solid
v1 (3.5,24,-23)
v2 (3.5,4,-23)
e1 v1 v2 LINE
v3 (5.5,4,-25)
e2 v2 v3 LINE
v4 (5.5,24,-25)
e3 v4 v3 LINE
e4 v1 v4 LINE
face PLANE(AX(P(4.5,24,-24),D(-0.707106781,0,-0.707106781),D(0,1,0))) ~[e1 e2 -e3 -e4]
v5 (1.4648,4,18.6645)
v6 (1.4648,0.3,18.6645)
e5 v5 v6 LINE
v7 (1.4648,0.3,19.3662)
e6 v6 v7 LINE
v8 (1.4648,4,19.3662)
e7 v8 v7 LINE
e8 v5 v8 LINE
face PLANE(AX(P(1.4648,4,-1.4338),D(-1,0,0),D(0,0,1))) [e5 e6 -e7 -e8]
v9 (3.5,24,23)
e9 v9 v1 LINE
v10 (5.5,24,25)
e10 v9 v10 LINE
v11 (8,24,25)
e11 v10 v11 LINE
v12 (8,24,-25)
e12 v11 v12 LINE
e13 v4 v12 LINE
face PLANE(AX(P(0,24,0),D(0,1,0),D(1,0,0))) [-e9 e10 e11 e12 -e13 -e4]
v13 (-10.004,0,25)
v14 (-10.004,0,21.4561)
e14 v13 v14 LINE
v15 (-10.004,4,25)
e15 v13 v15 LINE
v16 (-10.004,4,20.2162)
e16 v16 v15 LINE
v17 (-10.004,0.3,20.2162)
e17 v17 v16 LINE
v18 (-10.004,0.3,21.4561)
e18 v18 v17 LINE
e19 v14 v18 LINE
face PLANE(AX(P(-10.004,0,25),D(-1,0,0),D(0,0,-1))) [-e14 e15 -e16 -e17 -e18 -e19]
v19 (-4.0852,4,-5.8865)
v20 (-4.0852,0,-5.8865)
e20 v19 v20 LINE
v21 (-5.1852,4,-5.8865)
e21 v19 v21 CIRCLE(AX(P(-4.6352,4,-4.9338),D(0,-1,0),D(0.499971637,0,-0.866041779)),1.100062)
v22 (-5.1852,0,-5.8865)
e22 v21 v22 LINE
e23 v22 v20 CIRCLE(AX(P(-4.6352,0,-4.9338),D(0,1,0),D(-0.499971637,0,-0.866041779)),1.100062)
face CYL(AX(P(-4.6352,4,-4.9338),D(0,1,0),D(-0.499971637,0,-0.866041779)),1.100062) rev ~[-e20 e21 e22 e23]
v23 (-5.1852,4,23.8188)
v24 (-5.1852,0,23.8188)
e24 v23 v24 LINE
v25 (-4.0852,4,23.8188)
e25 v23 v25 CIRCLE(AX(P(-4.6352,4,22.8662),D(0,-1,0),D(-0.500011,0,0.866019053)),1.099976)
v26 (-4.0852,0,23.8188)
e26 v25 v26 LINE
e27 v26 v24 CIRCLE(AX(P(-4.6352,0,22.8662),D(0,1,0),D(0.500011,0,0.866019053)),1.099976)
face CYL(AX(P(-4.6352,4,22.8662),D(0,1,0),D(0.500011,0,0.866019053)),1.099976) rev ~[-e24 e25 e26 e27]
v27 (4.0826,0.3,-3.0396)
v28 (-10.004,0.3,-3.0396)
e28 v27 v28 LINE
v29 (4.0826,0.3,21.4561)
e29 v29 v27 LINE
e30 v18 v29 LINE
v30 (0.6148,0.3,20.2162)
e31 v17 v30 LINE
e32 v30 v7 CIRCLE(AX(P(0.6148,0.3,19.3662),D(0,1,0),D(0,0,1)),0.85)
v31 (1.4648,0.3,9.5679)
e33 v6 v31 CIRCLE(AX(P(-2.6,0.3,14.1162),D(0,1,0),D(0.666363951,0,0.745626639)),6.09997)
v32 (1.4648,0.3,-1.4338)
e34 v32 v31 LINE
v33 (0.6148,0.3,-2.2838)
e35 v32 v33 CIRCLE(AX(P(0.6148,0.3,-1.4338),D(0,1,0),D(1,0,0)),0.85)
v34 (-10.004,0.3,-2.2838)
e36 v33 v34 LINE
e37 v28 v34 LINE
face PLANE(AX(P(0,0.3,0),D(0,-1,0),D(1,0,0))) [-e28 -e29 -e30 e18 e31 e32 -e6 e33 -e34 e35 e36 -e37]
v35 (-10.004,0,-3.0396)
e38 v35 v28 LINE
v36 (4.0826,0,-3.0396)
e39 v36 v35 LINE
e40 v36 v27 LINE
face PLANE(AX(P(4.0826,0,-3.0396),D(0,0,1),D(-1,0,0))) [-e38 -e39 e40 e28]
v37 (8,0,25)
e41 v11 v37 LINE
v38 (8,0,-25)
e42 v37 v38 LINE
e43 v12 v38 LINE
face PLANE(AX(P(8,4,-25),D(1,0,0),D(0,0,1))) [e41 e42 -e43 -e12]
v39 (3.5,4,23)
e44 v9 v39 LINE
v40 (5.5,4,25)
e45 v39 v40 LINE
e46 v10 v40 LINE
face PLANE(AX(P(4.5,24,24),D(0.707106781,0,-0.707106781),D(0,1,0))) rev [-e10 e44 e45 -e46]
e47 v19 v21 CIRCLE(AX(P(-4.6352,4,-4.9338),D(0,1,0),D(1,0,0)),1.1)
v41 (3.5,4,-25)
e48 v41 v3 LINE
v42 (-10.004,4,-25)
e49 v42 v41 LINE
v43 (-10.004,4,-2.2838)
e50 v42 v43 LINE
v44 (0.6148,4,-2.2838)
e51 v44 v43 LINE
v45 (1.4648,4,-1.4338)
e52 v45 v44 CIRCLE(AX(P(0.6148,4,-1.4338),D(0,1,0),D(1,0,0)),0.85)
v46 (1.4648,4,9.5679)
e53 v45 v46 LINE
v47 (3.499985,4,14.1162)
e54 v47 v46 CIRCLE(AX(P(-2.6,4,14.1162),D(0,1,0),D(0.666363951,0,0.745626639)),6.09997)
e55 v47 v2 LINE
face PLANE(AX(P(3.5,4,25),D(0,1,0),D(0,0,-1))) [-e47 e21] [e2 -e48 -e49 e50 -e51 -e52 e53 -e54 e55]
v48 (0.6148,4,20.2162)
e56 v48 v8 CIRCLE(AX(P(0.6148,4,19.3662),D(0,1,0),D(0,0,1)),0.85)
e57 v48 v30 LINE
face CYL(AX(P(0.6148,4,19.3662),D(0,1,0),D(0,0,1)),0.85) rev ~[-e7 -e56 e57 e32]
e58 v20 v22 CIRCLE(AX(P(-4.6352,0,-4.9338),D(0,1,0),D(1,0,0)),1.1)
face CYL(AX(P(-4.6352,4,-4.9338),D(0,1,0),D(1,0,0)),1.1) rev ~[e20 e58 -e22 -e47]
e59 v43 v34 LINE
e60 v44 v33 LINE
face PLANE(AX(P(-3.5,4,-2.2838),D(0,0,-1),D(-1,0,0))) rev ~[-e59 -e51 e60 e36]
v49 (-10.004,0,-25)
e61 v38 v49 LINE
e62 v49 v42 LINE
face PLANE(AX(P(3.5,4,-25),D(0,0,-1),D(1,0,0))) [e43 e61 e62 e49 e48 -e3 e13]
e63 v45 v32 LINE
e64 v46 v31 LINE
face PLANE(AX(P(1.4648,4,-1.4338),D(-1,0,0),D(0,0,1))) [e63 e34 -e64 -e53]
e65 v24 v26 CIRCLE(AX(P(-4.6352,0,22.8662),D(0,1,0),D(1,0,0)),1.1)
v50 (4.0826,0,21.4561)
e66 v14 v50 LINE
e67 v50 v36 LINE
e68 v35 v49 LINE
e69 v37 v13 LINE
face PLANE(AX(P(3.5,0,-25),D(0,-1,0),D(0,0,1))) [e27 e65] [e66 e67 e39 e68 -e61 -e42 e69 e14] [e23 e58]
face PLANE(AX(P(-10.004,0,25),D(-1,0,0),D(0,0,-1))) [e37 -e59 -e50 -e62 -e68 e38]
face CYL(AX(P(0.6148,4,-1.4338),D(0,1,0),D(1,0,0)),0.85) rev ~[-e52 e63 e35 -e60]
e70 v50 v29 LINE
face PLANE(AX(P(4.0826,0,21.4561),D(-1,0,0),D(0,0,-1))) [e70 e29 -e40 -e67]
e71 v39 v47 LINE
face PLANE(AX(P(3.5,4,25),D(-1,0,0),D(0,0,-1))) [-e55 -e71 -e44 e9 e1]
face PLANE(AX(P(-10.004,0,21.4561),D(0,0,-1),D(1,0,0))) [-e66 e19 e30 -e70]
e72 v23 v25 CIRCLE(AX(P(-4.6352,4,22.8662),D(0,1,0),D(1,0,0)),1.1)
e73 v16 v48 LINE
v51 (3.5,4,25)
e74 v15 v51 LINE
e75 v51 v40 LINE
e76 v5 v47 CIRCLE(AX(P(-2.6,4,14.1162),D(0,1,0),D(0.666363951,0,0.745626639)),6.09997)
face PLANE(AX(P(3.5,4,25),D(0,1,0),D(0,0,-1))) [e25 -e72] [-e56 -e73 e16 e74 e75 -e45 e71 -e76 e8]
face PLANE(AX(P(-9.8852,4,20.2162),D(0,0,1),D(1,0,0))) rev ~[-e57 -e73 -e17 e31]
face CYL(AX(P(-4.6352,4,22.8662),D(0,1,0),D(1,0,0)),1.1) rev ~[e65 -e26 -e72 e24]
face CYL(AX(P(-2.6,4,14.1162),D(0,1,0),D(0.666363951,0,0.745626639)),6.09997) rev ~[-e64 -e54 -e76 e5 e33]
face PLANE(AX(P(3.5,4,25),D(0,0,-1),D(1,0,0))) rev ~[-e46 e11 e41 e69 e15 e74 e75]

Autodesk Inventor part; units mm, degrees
ref_plane "YZ Plane" through (0, 0, 0) normal (1, 0, 0) x (0, 1, 0)
ref_plane "XZ Plane" through (0, 0, 0) normal (0, 1, 0) x (-1, 0, 0)
ref_plane "XY Plane" through (0, 0, 0) normal (0, 0, 1) x (1, 0, 0)
sketch "Эскиз1" plane through (0, 0, 0) normal (0, 1, 0) x (-1, 0, 0)
  line L0 (0, 0) -> (0, -20)
  circle A0 centre (0, -20) radius 2
  line L1 (-3.5, 25) -> (3.5, 25)
  line L2 (3.5, 25) -> (3.5, -25)
  line L3 (3.5, -25) -> (-3.5, -25)
  line L4 (-3.5, -25) -> (-3.5, 25)
  line L5 (-3.5, 25) -> (3.5, -25) construction
  line L6 (3.5, 25) -> (-3.5, -25) construction
  line L7 (0, 0) -> (0, 20)
  circle A1 centre (0, 20) radius 2
  dimension "d0" = 20
  dimension "d1" = 4
  dimension "d2" = 7
  dimension "d3" = 50
  dimension "d4" = 20
  dimension "d5" = 4
extrude "Выдавливание1" add sketch "Эскиз1" along normal blind 4 contours A0 | L1 L2 L3 L4 | A1
sketch "Эскиз2" plane through (3.5, 0, 25) normal (1, 0, 0) x (0, 0, -1)
  line L0 (50, 0) -> (0, 0) projected
  line L1 (0, 4) -> (50, 4)
  line L2 (50, 4) -> (50, 0)
  line L3 (50, 0) -> (0, 0)
  line L4 (0, 0) -> (0, 4)
  point P0 (25, 0)
extrude "Выдавливание2" add sketch "Эскиз2" along normal blind 7
sketch "Эскиз3" plane through (0, 4, 0) normal (0, 1, 0) x (1, 0, 0)
  line L0 (-3.5, -25) -> (10.5, -25) projected
  line L1 (-3.5, 25) -> (10.5, 25) projected
  line L2 (10.5, -25) -> (3.5, -25)
  line L3 (3.5, -25) -> (3.5, 25)
  line L4 (3.5, 25) -> (10.5, 25)
  line L5 (10.5, 25) -> (10.5, -25)
  point P0 (0, 0)
  dimension "d10" = 7
extrude "Выдавливание3" add sketch "Эскиз3" along normal blind 20
sketch "Эскиз5" plane through (0, 4, 0) normal (0, 1, 0) x (1, 0, 0)
  line L0 (-7.5352, -8.6362) -> (-7.5352, -8.5162)
  arc A0 (-1.7352, -8.5162) -> (-7.5352, -8.5162) centre (-4.6352, -8.5162) ccw
  line L1 (-1.7352, -8.5162) -> (-1.7352, -8.6362)
  arc A1 (1.3648, -12.5541) -> (-1.7352, -8.6362) centre (-4.6352, -14.1162) ccw
  line L2 (1.3648, -12.5541) -> (1.3648, 1.4338)
  arc A2 (1.3648, 1.4338) -> (0.6148, 2.1838) centre (0.6148, 1.4338) ccw
  line L3 (0.6148, 2.1838) -> (-9.8852, 2.1838)
  arc A3 (-9.8852, 2.1838) -> (-10.6352, 1.4338) centre (-9.8852, 1.4338) ccw
  line L4 (-10.6352, 1.4338) -> (-10.6352, -12.5541)
  arc A4 (-7.5352, -8.6362) -> (-10.6352, -12.5541) centre (-4.6352, -14.1162) ccw
  line L5 (0.4648, -4.2162) -> (0.4648, 0.7838)
  arc A5 (-0.0352, -4.7162) -> (0.4648, -4.2162) centre (-0.0352, -4.2162) ccw
  line L6 (-9.2352, -4.7162) -> (-0.0352, -4.7162)
  arc A6 (-9.7352, -4.2162) -> (-9.2352, -4.7162) centre (-9.2352, -4.2162) ccw
  line L7 (-9.7352, 0.7838) -> (-9.7352, -4.2162)
  arc A7 (-9.2352, 1.2838) -> (-9.7352, 0.7838) centre (-9.2352, 0.7838) ccw
  line L8 (-0.0352, 1.2838) -> (-9.2352, 1.2838)
  arc A8 (0.4648, 0.7838) -> (-0.0352, 1.2838) centre (-0.0352, 0.7838) ccw
  arc A9 (-5.1852, 5.8865) -> (-4.0852, 5.8865) centre (-4.6352, 4.9338) ccw
  line L9 (-5.1852, 7.0838) -> (-5.1852, 5.8865)
  line L10 (-5.1852, 7.0838) -> (-9.8852, 7.0838)
  arc A10 (-9.8852, 7.0838) -> (-10.7352, 6.2338) centre (-9.8852, 6.2338) ccw
  line L11 (-10.7352, 6.2338) -> (-10.7352, 1.4338)
  arc A11 (-9.8852, 2.2838) -> (-10.7352, 1.4338) centre (-9.8852, 1.4338) ccw
  line L12 (0.6148, 2.2838) -> (-9.8852, 2.2838)
  arc A12 (1.4648, 1.4338) -> (0.6148, 2.2838) centre (0.6148, 1.4338) ccw
  line L13 (1.4648, 1.4338) -> (1.4648, 6.2338)
  arc A13 (1.4648, 6.2338) -> (0.6148, 7.0838) centre (0.6148, 6.2338) ccw
  line L14 (0.6148, 7.0838) -> (-4.0852, 7.0838)
  line L15 (-4.0852, 5.8865) -> (-4.0852, 7.0838)
  line L16 (-9.8852, -25.0162) -> (-5.1852, -25.0162)
  line L17 (-5.1852, -23.8188) -> (-5.1852, -25.0162)
  arc A14 (-4.0852, -23.8188) -> (-5.1852, -23.8188) centre (-4.6352, -22.8662) ccw
  line L18 (-4.0852, -25.0162) -> (-4.0852, -23.8188)
  line L19 (-4.0852, -25.0162) -> (0.6148, -25.0162)
  arc A15 (0.6148, -25.0162) -> (1.4648, -24.1662) centre (0.6148, -24.1662) ccw
  line L20 (1.4648, -24.1662) -> (1.4648, -19.3662)
  arc A16 (0.6148, -20.2162) -> (1.4648, -19.3662) centre (0.6148, -19.3662) ccw
  line L21 (-9.8852, -20.2162) -> (0.6148, -20.2162)
  arc A17 (-10.7352, -19.3662) -> (-9.8852, -20.2162) centre (-9.8852, -19.3662) ccw
  line L22 (-10.7352, -19.3662) -> (-10.7352, -24.1662)
  arc A18 (-10.7352, -24.1662) -> (-9.8852, -25.0162) centre (-9.8852, -24.1662) ccw
  line L23 (-10.7352, -19.3662) -> (-10.7352, -15.6782)
  line L24 (-10.7352, -12.5541) -> (-10.7352, -14.1162)
  line L25 (-10.7352, -14.1162) -> (-10.7352, -15.6782)
  line L26 (-10.7352, -12.5541) -> (-10.7352, 1.4338)
  line L27 (1.4648, 1.4338) -> (1.4648, -12.5541)
  line L28 (1.4648, -15.6782) -> (1.4648, -19.3662)
  line L29 (1.4648, -15.6782) -> (1.4648, -14.1162)
  line L30 (1.4648, -14.1162) -> (1.4648, -12.5541)
  arc A19 (-10.6352, -15.6782) -> (-6.1972, -20.1162) centre (-4.6352, -14.1162) ccw
  line L31 (-10.6352, -15.6782) -> (-10.6352, -19.3662)
  arc A20 (-10.6352, -19.3662) -> (-9.8852, -20.1162) centre (-9.8852, -19.3662) ccw
  line L32 (-9.8852, -20.1162) -> (-6.1972, -20.1162)
  line L33 (1.3648, -19.3662) -> (1.3648, -15.6782)
  arc A21 (-3.0731, -20.1162) -> (1.3648, -15.6782) centre (-4.6352, -14.1162) ccw
  line L34 (-3.0731, -20.1162) -> (0.6148, -20.1162)
  arc A22 (0.6148, -20.1162) -> (1.3648, -19.3662) centre (0.6148, -19.3662) ccw
  circle A23 centre (-4.6352, 4.9338) radius 1.1
  line L35 (-5.1852, 5.8865) -> (-5.1852, 7.0838)
  line L36 (-4.0852, 7.0838) -> (-5.1852, 7.0838)
  circle A24 centre (-4.6352, -22.8662) radius 1.1
  line L37 (-5.1852, -25.0162) -> (-5.1852, -23.8188)
  line L38 (-4.0852, -25.0162) -> (-5.1852, -25.0162)
  circle A25 centre (-4.6352, -14.1162) radius 0.8
  line L39 (-3.5, 25) -> (3.5, 25) projected
  line L40 (-13.5, 25) -> (-13.5, -25)
  line L41 (-13.5, -25) -> (-3.5, -25)
  line L42 (-3.5, -25) -> (-3.5, 25)
  point P0 (0, 0)
  point P1 (-4.6352, -8.9662)
  dimension "d16" = 10
extrude "Выдавливание5" cut sketch "Эскиз5" against normal blind 10 contours A4 L4 A3 L3 L42 L8 A7 L7 A6 L6 A0 L0 | L0 A0 L42 L21 A17 L23 L25 L24 L26 A11 L12 L3 A3 L4 A4 | L42 L6 A5 L5 A8 L8 L3 A2 L2 A1 L1 A0 | A0 L1 A1 L2 A2 L3 L42 L12 A12 L27 L30 L29 L28 A16 L21 | L42 L8 A8 L5 A5 L6 | L6 A6 L7 A7 L8 L42 | A19 L32 A20 L31 | A22 L34 A21 L33 | A25
move faces "Перенос1" translate (-6.504, 0, 0) faces at (-3.5, 2.6667, -9.8559) (-3.5, 1.3333, 23.4054)
sketch "Эскиз6" plane through (0, 4, 0) normal (0, 1, 0) x (1, 0, 0)
  arc A0 (1.4648, -18.6645) -> (1.4648, -9.5679) centre (-2.6, -14.1162) ccw
  line L0 (1.4648, -9.5679) -> (1.4648, -19.3662)
  point P0 (0, 0)
  point P1 (0.2532, -8.7246)
  point P2 (-5.4532, -8.7246)
extrude "Выдавливание6" cut sketch "Эскиз6" against normal blind 7
sketch "Эскиз7" plane through (0, 0, 0) normal (0, -1, 0) x (1, 0, 0)
  line L0 (-10.004, 25) -> (-10.004, 20.2162) projected
  line L1 (-10.004, 21.4561) -> (4.0826, 21.4561)
  line L2 (4.0826, 21.4561) -> (4.0826, -3.0396)
  line L3 (4.0826, -3.0396) -> (-10.004, -3.0396)
  line L4 (-10.004, -3.0396) -> (-10.004, 21.4561)
  point P0 (0, 0)
extrude "Выдавливание7" cut sketch "Эскиз7" against normal blind 0.3
sketch "Эскиз8" plane through (0, 4, 0) normal (0, 1, 0) x (1, 0, 0)
  line L0 (-7.5352, -8.6362) -> (-7.5352, -8.5162)
  arc A0 (-1.7352, -8.5162) -> (-7.5352, -8.5162) centre (-4.6352, -8.5162) ccw
  line L1 (-1.7352, -8.5162) -> (-1.7352, -8.6362)
  arc A1 (1.3648, -12.5541) -> (-1.7352, -8.6362) centre (-4.6352, -14.1162) ccw
  line L2 (1.3648, -12.5541) -> (1.3648, 1.4338)
  arc A2 (1.3648, 1.4338) -> (0.6148, 2.1838) centre (0.6148, 1.4338) ccw
  line L3 (0.6148, 2.1838) -> (-9.8852, 2.1838)
  arc A3 (-9.8852, 2.1838) -> (-10.6352, 1.4338) centre (-9.8852, 1.4338) ccw
  line L4 (-10.6352, 1.4338) -> (-10.6352, -12.5541)
  arc A4 (-7.5352, -8.6362) -> (-10.6352, -12.5541) centre (-4.6352, -14.1162) ccw
  line L5 (0.4648, -4.2162) -> (0.4648, 0.7838)
  arc A5 (-0.0352, -4.7162) -> (0.4648, -4.2162) centre (-0.0352, -4.2162) ccw
  line L6 (-9.2352, -4.7162) -> (-0.0352, -4.7162)
  arc A6 (-9.7352, -4.2162) -> (-9.2352, -4.7162) centre (-9.2352, -4.2162) ccw
  line L7 (-9.7352, 0.7838) -> (-9.7352, -4.2162)
  arc A7 (-9.2352, 1.2838) -> (-9.7352, 0.7838) centre (-9.2352, 0.7838) ccw
  line L8 (-0.0352, 1.2838) -> (-9.2352, 1.2838)
  arc A8 (0.4648, 0.7838) -> (-0.0352, 1.2838) centre (-0.0352, 0.7838) ccw
  arc A9 (-5.1852, 5.8865) -> (-4.0852, 5.8865) centre (-4.6352, 4.9338) ccw
  line L9 (-5.1852, 7.0838) -> (-5.1852, 5.8865)
  line L10 (-5.1852, 7.0838) -> (-9.8852, 7.0838)
  arc A10 (-9.8852, 7.0838) -> (-10.7352, 6.2338) centre (-9.8852, 6.2338) ccw
  line L11 (-10.7352, 6.2338) -> (-10.7352, 1.4338)
  arc A11 (-9.8852, 2.2838) -> (-10.7352, 1.4338) centre (-9.8852, 1.4338) ccw
  line L12 (0.6148, 2.2838) -> (-9.8852, 2.2838)
  arc A12 (1.4648, 1.4338) -> (0.6148, 2.2838) centre (0.6148, 1.4338) ccw
  line L13 (1.4648, 1.4338) -> (1.4648, 6.2338)
  arc A13 (1.4648, 6.2338) -> (0.6148, 7.0838) centre (0.6148, 6.2338) ccw
  line L14 (0.6148, 7.0838) -> (-4.0852, 7.0838)
  line L15 (-4.0852, 5.8865) -> (-4.0852, 7.0838)
  line L16 (-9.8852, -25.0162) -> (-5.1852, -25.0162)
  line L17 (-5.1852, -23.8188) -> (-5.1852, -25.0162)
  arc A14 (-4.0852, -23.8188) -> (-5.1852, -23.8188) centre (-4.6352, -22.8662) ccw
  line L18 (-4.0852, -25.0162) -> (-4.0852, -23.8188)
  line L19 (-4.0852, -25.0162) -> (0.6148, -25.0162)
  arc A15 (0.6148, -25.0162) -> (1.4648, -24.1662) centre (0.6148, -24.1662) ccw
  line L20 (1.4648, -24.1662) -> (1.4648, -19.3662)
  arc A16 (0.6148, -20.2162) -> (1.4648, -19.3662) centre (0.6148, -19.3662) ccw
  line L21 (-9.8852, -20.2162) -> (0.6148, -20.2162)
  arc A17 (-10.7352, -19.3662) -> (-9.8852, -20.2162) centre (-9.8852, -19.3662) ccw
  line L22 (-10.7352, -19.3662) -> (-10.7352, -24.1662)
  arc A18 (-10.7352, -24.1662) -> (-9.8852, -25.0162) centre (-9.8852, -24.1662) ccw
  line L23 (-10.7352, -19.3662) -> (-10.7352, -15.6782)
  line L24 (-10.7352, -12.5541) -> (-10.7352, -14.1162)
  line L25 (-10.7352, -14.1162) -> (-10.7352, -15.6782)
  line L26 (-10.7352, -12.5541) -> (-10.7352, 1.4338)
  line L27 (1.4648, 1.4338) -> (1.4648, -12.5541)
  line L28 (1.4648, -15.6782) -> (1.4648, -19.3662)
  line L29 (1.4648, -15.6782) -> (1.4648, -14.1162)
  line L30 (1.4648, -14.1162) -> (1.4648, -12.5541)
  arc A19 (-10.6352, -15.6782) -> (-6.1972, -20.1162) centre (-4.6352, -14.1162) ccw
  line L31 (-10.6352, -15.6782) -> (-10.6352, -19.3662)
  arc A20 (-10.6352, -19.3662) -> (-9.8852, -20.1162) centre (-9.8852, -19.3662) ccw
  line L32 (-9.8852, -20.1162) -> (-6.1972, -20.1162)
  line L33 (1.3648, -19.3662) -> (1.3648, -15.6782)
  arc A21 (-3.0731, -20.1162) -> (1.3648, -15.6782) centre (-4.6352, -14.1162) ccw
  line L34 (-3.0731, -20.1162) -> (0.6148, -20.1162)
  arc A22 (0.6148, -20.1162) -> (1.3648, -19.3662) centre (0.6148, -19.3662) ccw
  circle A23 centre (-4.6352, 4.9338) radius 1.1
  line L35 (-5.1852, 5.8865) -> (-5.1852, 7.0838)
  line L36 (-4.0852, 7.0838) -> (-5.1852, 7.0838)
  circle A24 centre (-4.6352, -22.8662) radius 1.1
  line L37 (-5.1852, -25.0162) -> (-5.1852, -23.8188)
  line L38 (-4.0852, -25.0162) -> (-5.1852, -25.0162)
  circle A25 centre (-4.6352, -14.1162) radius 0.8
  line L39 (-3.5, 25) -> (3.5, 25)
  line L40 (-13.5, 25) -> (-13.5, -25)
  line L41 (-13.5, -25) -> (-3.5, -25)
  line L42 (-3.5, -25) -> (-3.5, 25)
  point P0 (0, 0)
  point P1 (0, 0)
  point P2 (-4.6352, -8.9662)
  dimension "d26" = 10
extrude "Выдавливание8" cut sketch "Эскиз8" against normal through all contours A24 A14 | A9 A23
move faces "Перенос2" translate (-2.5, 0, 0) faces at (10.5, 8, -8.3333)
chamfer "Фаска1" distance 2 angle 45 2 edges at (3.5, 14, 25) (3.5, 14, -25)
properties part number "000.705 - Пассивный прижим"
